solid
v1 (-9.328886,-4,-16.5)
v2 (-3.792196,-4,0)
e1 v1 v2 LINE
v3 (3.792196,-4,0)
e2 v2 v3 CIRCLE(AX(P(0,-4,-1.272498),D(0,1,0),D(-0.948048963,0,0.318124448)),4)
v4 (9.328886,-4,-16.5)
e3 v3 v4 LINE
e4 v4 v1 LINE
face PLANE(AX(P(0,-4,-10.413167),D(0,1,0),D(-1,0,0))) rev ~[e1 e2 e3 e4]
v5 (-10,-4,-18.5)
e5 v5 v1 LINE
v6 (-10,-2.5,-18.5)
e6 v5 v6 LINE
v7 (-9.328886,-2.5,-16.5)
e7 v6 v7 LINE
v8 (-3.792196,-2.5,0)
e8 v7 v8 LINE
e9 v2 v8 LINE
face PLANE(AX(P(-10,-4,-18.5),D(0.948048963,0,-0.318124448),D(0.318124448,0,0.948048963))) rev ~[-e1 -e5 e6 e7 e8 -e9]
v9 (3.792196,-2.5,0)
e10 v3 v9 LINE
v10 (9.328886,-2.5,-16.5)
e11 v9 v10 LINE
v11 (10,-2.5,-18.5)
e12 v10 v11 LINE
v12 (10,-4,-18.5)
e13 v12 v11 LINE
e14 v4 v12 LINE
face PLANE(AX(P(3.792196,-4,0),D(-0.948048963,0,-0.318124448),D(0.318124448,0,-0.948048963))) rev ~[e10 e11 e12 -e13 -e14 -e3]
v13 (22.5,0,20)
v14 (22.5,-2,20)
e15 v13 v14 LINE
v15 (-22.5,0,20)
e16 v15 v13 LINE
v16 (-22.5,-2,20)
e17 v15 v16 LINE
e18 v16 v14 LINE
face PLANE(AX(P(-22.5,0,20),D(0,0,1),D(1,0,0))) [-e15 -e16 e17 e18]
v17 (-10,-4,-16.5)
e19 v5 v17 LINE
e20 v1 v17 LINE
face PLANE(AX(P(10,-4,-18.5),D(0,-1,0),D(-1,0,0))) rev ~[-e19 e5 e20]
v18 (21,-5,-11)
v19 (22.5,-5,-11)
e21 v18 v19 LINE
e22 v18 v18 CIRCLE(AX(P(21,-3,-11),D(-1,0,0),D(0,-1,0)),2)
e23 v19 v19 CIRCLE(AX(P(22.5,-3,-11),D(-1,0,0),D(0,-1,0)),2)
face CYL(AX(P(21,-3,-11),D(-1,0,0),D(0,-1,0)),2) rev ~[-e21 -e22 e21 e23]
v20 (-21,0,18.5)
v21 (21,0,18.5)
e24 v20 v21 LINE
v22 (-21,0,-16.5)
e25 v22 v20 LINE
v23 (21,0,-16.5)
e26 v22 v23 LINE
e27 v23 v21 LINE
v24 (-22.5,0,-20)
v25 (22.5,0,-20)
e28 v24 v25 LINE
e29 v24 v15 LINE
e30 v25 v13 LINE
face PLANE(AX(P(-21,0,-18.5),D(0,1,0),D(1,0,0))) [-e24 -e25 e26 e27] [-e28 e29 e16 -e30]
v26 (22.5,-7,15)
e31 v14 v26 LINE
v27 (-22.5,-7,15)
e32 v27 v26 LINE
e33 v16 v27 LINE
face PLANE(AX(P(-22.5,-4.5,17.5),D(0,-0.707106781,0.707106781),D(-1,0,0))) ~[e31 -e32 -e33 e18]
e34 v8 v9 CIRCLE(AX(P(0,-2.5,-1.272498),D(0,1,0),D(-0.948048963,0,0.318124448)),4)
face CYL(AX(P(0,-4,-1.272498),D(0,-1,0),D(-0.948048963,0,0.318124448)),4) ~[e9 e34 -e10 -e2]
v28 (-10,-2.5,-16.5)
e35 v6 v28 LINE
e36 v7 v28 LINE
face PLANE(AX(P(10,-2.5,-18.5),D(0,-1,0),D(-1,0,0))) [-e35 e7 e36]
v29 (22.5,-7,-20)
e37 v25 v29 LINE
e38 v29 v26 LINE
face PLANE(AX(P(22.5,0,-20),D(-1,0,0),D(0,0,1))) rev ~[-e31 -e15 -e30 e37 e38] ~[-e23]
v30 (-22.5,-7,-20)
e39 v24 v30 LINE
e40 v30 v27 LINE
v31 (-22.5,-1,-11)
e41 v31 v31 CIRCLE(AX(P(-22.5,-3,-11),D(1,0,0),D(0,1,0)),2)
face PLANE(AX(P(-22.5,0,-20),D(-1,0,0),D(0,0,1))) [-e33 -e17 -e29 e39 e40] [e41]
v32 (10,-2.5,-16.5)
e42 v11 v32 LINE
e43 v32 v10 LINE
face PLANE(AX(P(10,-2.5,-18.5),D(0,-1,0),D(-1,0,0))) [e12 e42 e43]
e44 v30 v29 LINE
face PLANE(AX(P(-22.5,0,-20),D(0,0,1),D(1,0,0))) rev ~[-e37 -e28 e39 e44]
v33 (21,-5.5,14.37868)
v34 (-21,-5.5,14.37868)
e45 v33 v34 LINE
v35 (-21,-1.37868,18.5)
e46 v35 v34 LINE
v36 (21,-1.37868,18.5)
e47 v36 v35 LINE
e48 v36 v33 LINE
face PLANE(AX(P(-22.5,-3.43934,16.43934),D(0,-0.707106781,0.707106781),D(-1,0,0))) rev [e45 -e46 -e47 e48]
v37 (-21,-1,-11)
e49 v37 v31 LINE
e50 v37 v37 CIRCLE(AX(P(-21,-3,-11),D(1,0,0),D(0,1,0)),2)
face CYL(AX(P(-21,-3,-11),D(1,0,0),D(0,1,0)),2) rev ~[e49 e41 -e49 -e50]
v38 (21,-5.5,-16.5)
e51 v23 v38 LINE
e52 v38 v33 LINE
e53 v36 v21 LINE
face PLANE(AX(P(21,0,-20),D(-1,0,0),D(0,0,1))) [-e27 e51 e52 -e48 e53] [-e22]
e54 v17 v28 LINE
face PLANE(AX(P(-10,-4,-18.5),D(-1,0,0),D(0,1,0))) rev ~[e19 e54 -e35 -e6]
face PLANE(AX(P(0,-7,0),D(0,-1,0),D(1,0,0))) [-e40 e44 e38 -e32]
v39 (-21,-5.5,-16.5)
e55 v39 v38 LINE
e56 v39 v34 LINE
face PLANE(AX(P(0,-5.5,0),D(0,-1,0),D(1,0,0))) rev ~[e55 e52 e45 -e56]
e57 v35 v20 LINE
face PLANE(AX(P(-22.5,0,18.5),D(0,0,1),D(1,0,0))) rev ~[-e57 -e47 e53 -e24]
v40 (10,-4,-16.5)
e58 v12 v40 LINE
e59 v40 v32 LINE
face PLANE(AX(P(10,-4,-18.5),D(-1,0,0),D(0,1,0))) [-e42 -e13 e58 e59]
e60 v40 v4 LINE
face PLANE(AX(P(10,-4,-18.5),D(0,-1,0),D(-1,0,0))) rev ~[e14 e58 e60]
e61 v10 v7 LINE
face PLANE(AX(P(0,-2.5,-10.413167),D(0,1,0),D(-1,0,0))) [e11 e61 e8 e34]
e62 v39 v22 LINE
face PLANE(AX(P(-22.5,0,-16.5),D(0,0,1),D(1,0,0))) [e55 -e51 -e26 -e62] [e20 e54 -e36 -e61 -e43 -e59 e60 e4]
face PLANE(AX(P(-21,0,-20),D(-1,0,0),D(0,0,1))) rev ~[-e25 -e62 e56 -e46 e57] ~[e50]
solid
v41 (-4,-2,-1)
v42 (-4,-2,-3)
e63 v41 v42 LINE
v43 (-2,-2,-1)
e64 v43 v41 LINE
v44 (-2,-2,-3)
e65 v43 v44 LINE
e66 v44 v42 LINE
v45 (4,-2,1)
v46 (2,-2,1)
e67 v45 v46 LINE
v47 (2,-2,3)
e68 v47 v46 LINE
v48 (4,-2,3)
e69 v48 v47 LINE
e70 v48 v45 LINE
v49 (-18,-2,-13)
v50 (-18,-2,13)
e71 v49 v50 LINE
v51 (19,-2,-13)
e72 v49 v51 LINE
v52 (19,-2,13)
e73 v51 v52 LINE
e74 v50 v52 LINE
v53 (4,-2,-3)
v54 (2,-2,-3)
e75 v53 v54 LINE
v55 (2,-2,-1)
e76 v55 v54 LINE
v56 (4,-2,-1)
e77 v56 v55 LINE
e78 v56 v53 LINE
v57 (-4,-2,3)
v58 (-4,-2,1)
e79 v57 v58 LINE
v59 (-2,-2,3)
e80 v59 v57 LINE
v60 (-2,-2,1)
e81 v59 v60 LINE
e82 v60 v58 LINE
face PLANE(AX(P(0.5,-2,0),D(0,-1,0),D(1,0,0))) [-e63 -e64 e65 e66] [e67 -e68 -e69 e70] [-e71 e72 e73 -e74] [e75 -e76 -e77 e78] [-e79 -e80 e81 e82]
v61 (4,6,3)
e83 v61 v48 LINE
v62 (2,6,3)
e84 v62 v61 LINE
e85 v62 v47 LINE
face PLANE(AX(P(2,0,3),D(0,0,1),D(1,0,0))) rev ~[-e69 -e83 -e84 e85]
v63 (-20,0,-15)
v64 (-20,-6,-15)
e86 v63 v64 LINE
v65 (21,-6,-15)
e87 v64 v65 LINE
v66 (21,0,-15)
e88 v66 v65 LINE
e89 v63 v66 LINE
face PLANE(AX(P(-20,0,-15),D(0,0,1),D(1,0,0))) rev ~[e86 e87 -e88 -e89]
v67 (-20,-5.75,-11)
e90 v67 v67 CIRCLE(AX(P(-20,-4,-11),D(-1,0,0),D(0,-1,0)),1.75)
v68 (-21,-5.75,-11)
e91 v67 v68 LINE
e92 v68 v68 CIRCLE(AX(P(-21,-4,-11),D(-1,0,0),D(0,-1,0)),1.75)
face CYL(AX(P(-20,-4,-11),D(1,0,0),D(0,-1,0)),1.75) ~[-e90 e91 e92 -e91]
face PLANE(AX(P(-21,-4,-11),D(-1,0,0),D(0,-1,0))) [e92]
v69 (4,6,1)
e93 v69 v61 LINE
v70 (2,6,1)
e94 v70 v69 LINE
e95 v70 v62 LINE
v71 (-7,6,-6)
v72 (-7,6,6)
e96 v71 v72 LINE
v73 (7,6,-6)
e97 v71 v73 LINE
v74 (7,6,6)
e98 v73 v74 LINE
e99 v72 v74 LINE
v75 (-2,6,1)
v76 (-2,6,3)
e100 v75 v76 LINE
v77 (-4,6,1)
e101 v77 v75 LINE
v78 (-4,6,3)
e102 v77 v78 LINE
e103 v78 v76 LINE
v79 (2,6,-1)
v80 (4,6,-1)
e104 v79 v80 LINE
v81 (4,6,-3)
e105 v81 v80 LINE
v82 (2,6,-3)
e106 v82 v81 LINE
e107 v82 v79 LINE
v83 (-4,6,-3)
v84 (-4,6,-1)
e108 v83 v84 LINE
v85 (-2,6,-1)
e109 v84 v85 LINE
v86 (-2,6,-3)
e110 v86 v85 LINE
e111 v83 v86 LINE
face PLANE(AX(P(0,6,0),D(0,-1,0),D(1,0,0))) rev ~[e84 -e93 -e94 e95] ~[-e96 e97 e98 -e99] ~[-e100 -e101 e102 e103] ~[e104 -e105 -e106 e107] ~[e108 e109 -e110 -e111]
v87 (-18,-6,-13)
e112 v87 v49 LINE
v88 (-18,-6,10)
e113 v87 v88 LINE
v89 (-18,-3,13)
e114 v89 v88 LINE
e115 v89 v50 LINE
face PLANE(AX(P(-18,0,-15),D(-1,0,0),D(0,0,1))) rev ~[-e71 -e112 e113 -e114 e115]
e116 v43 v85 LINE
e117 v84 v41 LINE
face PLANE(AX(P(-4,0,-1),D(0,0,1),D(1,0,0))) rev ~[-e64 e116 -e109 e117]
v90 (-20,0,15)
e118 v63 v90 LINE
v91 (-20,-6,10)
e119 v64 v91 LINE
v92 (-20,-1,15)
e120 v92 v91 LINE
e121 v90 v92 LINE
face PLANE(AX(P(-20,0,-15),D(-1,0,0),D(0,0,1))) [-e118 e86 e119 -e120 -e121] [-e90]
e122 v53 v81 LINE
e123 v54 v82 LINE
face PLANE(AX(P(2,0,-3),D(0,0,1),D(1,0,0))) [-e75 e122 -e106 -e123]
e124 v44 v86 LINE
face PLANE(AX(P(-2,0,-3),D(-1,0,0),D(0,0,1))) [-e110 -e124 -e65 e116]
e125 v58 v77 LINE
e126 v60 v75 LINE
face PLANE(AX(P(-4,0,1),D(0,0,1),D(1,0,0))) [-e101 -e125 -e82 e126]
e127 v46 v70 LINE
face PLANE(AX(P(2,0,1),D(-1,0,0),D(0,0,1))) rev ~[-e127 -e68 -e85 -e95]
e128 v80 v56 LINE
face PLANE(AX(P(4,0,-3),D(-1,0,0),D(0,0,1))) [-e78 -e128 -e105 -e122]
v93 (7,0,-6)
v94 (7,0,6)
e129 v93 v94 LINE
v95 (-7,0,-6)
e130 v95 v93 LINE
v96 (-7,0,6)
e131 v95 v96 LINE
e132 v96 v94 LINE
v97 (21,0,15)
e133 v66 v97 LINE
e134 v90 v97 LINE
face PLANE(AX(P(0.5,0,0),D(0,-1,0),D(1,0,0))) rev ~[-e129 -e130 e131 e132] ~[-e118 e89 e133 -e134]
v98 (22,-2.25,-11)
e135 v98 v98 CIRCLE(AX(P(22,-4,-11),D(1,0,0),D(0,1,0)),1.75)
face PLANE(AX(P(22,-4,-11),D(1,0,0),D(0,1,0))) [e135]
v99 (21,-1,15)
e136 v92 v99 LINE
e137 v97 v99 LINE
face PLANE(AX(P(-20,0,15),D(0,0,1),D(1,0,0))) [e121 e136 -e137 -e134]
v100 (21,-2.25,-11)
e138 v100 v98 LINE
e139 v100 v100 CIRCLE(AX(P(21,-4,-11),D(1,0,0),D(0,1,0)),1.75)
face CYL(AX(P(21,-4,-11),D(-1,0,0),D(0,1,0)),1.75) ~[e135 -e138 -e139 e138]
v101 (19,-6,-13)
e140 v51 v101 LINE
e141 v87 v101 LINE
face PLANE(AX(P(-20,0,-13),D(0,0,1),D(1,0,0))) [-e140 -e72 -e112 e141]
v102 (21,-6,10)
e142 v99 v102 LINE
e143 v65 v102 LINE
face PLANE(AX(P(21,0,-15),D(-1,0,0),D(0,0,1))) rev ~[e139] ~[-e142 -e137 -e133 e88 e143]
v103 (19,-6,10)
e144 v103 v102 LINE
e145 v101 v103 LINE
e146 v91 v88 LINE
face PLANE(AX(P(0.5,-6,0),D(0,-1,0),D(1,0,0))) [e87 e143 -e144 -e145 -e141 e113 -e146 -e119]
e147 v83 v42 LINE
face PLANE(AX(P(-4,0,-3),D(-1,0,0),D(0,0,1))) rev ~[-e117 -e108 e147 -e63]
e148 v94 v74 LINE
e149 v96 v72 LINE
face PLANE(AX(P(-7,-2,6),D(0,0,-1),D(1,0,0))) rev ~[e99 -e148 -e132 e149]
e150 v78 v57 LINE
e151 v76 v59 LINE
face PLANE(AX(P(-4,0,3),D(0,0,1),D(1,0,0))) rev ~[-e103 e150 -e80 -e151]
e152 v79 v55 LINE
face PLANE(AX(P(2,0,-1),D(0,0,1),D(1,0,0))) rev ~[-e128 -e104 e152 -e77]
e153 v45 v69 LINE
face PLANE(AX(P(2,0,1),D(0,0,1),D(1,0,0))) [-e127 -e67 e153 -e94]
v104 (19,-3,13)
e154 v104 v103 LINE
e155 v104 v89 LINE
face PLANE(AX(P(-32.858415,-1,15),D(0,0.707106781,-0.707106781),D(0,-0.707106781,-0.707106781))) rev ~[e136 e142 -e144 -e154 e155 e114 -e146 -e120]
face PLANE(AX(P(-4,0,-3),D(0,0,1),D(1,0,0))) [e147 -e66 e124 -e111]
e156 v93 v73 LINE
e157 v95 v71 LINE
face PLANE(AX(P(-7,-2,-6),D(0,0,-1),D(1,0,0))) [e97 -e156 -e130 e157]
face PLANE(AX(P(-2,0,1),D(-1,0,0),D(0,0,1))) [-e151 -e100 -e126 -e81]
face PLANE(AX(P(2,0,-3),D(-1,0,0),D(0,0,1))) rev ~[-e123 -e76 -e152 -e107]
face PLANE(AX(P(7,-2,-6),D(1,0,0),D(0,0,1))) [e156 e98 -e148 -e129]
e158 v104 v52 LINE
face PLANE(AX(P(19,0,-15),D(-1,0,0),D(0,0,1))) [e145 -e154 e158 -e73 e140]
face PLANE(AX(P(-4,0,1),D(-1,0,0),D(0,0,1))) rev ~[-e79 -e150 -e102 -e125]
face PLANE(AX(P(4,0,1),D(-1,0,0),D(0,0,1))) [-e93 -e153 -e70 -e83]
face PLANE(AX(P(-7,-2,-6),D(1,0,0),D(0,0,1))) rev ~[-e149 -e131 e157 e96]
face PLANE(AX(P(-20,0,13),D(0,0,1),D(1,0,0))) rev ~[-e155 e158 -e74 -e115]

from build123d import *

# Parameters (mm, degrees)
F0_W         = 41
F0_H         = 30
F1_DEPTH     = 6
F2_T         = -2
F3_W         = 2
F3_H         = 2
F4_DEPTH     = 10
F5_R         = 1.75
F6_DEPTH     = 1
F7_R         = 1.75
F8_DEPTH     = 1
F9_W         = 45
F9_H         = 40
F10_DEPTH    = 7
F11_SIZE     = 5
F12_T        = -1.5
F13_T1_DEPTH = 66.7168298797
F16_DEPTH    = 1.5
F17_R        = 2
F18_DEPTH    = 25
F19_R        = 2
F20_DEPTH    = 25
F21_DEPTH    = 2
F22_W        = 14
F22_H        = 12
F22_W_2      = 2
F22_H_2      = 2
F23_DEPTH    = 8


# Not quite as in the source:
# - a fillet or chamfer that OpenCascade refuses, or shapes differently, is made with other operations: its cross-section is extruded or revolved along the edge and cut away or added
# - a feature names something its author has since deleted; it is built from what else it names


with BuildPart() as f1:
    # F0 (on Front) → F1 (new body)
    with BuildSketch(Plane.XZ):
        with Locations((0.5, 0)):
            Rectangle(F0_W, F0_H)
    extrude(amount=F1_DEPTH)

    # F2
    f2_openings = [f1.faces().sort_by_distance(p)[0] for p in [
        (0.5, -6, 0),
    ]]
    offset(amount=F2_T, openings=f2_openings)

    # F3 (on face) → F4 (cut)
    with BuildSketch(Plane.XZ):
        with Locations((-3, -2)):
            Rectangle(F3_W, F3_H)
        with Locations((3, -2)):
            Rectangle(F3_W, F3_H)
        with Locations((3, 2)):
            Rectangle(F3_W, F3_H)
        with Locations((-3, 2)):
            Rectangle(F3_W, F3_H)
    extrude(amount=F4_DEPTH, mode=Mode.SUBTRACT)

    # F5 (on face) → F6 (join)
    with BuildSketch(Plane.YZ.offset(21)):
        with Locations((-4, -11)):
            Circle(F5_R)
    extrude(amount=F6_DEPTH)

    # F7 (on face) → F8 (join)
    with BuildSketch(Plane(origin=(-20, 0, 0), x_dir=(0, -1, 0), z_dir=(-1, 0, 0))):
        with Locations((4, -11)):
            Circle(F7_R)
    extrude(amount=F8_DEPTH)

    # F13: chamfer of 5 on 1 edges, made by hand

    # F13_s2 → F13_t1 (cut)
    with BuildSketch(Plane.YZ.offset(-32.8584149398)):
        Polygon((-1, 15), (-6, 10), (-6, 15), align=None)
    extrude(amount=F13_T1_DEPTH, mode=Mode.SUBTRACT)

    # F22 (on face) → F23 (join)
    with BuildSketch(Plane.XZ.offset(2)):
        Rectangle(F22_W, F22_H)
        with Locations((-3, -2)):
            Rectangle(F22_W_2, F22_H_2, mode=Mode.SUBTRACT)
        with Locations((3, -2)):
            Rectangle(F22_W_2, F22_H_2, mode=Mode.SUBTRACT)
        with Locations((-3, 2)):
            Rectangle(F22_W_2, F22_H_2, mode=Mode.SUBTRACT)
        with Locations((3, 2)):
            Rectangle(F22_W_2, F22_H_2, mode=Mode.SUBTRACT)
    extrude(amount=-F23_DEPTH)


with BuildPart() as f10:
    # F9 (on Front) → F10 (new body)
    with BuildSketch(Plane.XZ):
        Rectangle(F9_W, F9_H)
    extrude(amount=F10_DEPTH)

    # F11
    f11_edges = [f10.edges().sort_by_distance(p)[0] for p in [
        (0, -7, 20),
    ]]
    chamfer(f11_edges, length=F11_SIZE)

    # F12
    f12_openings = [f10.faces().sort_by_distance(p)[0] for p in [
        (0, 0, 0),
    ]]
    offset(amount=F12_T, openings=f12_openings)

    # F15 (on offset) → F16 (join)
    with BuildSketch(Plane(origin=(0, -4, 0), x_dir=(-1, 0, 0), z_dir=(0, 1, 0))):
        with BuildLine():
            Line((-10, -18.5), (10, -18.5))
            Line((10, -18.5), (3.7921958509, 0))
            ThreePointArc((3.7921958509, 0), (0, 2.7275022088), (-3.7921958509, 0))
            Line((-3.7921958509, 0), (-10, -18.5))
        make_face()
    extrude(amount=F16_DEPTH)

    # F17 (on face) → F18 (cut)
    with BuildSketch(Plane.YZ.offset(-21)):
        with Locations((-3, -11)):
            Circle(F17_R)
    extrude(amount=-F18_DEPTH, mode=Mode.SUBTRACT)

    # F19 (on face) → F20 (cut)
    with BuildSketch(Plane(origin=(21, 0, 0), x_dir=(0, -1, 0), z_dir=(-1, 0, 0))):
        with Locations((3, -11)):
            Circle(F19_R)
    extrude(amount=-F20_DEPTH, mode=Mode.SUBTRACT)

    # F21 (add): a face of the model
    f21_faces = [f10.faces().sort_by_distance(p)[0] for p in [
        (0, -0.4235858827, -18.5),
    ]]
    extrude(f21_faces, amount=F21_DEPTH)


solid = Compound([f1.part, f10.part])
